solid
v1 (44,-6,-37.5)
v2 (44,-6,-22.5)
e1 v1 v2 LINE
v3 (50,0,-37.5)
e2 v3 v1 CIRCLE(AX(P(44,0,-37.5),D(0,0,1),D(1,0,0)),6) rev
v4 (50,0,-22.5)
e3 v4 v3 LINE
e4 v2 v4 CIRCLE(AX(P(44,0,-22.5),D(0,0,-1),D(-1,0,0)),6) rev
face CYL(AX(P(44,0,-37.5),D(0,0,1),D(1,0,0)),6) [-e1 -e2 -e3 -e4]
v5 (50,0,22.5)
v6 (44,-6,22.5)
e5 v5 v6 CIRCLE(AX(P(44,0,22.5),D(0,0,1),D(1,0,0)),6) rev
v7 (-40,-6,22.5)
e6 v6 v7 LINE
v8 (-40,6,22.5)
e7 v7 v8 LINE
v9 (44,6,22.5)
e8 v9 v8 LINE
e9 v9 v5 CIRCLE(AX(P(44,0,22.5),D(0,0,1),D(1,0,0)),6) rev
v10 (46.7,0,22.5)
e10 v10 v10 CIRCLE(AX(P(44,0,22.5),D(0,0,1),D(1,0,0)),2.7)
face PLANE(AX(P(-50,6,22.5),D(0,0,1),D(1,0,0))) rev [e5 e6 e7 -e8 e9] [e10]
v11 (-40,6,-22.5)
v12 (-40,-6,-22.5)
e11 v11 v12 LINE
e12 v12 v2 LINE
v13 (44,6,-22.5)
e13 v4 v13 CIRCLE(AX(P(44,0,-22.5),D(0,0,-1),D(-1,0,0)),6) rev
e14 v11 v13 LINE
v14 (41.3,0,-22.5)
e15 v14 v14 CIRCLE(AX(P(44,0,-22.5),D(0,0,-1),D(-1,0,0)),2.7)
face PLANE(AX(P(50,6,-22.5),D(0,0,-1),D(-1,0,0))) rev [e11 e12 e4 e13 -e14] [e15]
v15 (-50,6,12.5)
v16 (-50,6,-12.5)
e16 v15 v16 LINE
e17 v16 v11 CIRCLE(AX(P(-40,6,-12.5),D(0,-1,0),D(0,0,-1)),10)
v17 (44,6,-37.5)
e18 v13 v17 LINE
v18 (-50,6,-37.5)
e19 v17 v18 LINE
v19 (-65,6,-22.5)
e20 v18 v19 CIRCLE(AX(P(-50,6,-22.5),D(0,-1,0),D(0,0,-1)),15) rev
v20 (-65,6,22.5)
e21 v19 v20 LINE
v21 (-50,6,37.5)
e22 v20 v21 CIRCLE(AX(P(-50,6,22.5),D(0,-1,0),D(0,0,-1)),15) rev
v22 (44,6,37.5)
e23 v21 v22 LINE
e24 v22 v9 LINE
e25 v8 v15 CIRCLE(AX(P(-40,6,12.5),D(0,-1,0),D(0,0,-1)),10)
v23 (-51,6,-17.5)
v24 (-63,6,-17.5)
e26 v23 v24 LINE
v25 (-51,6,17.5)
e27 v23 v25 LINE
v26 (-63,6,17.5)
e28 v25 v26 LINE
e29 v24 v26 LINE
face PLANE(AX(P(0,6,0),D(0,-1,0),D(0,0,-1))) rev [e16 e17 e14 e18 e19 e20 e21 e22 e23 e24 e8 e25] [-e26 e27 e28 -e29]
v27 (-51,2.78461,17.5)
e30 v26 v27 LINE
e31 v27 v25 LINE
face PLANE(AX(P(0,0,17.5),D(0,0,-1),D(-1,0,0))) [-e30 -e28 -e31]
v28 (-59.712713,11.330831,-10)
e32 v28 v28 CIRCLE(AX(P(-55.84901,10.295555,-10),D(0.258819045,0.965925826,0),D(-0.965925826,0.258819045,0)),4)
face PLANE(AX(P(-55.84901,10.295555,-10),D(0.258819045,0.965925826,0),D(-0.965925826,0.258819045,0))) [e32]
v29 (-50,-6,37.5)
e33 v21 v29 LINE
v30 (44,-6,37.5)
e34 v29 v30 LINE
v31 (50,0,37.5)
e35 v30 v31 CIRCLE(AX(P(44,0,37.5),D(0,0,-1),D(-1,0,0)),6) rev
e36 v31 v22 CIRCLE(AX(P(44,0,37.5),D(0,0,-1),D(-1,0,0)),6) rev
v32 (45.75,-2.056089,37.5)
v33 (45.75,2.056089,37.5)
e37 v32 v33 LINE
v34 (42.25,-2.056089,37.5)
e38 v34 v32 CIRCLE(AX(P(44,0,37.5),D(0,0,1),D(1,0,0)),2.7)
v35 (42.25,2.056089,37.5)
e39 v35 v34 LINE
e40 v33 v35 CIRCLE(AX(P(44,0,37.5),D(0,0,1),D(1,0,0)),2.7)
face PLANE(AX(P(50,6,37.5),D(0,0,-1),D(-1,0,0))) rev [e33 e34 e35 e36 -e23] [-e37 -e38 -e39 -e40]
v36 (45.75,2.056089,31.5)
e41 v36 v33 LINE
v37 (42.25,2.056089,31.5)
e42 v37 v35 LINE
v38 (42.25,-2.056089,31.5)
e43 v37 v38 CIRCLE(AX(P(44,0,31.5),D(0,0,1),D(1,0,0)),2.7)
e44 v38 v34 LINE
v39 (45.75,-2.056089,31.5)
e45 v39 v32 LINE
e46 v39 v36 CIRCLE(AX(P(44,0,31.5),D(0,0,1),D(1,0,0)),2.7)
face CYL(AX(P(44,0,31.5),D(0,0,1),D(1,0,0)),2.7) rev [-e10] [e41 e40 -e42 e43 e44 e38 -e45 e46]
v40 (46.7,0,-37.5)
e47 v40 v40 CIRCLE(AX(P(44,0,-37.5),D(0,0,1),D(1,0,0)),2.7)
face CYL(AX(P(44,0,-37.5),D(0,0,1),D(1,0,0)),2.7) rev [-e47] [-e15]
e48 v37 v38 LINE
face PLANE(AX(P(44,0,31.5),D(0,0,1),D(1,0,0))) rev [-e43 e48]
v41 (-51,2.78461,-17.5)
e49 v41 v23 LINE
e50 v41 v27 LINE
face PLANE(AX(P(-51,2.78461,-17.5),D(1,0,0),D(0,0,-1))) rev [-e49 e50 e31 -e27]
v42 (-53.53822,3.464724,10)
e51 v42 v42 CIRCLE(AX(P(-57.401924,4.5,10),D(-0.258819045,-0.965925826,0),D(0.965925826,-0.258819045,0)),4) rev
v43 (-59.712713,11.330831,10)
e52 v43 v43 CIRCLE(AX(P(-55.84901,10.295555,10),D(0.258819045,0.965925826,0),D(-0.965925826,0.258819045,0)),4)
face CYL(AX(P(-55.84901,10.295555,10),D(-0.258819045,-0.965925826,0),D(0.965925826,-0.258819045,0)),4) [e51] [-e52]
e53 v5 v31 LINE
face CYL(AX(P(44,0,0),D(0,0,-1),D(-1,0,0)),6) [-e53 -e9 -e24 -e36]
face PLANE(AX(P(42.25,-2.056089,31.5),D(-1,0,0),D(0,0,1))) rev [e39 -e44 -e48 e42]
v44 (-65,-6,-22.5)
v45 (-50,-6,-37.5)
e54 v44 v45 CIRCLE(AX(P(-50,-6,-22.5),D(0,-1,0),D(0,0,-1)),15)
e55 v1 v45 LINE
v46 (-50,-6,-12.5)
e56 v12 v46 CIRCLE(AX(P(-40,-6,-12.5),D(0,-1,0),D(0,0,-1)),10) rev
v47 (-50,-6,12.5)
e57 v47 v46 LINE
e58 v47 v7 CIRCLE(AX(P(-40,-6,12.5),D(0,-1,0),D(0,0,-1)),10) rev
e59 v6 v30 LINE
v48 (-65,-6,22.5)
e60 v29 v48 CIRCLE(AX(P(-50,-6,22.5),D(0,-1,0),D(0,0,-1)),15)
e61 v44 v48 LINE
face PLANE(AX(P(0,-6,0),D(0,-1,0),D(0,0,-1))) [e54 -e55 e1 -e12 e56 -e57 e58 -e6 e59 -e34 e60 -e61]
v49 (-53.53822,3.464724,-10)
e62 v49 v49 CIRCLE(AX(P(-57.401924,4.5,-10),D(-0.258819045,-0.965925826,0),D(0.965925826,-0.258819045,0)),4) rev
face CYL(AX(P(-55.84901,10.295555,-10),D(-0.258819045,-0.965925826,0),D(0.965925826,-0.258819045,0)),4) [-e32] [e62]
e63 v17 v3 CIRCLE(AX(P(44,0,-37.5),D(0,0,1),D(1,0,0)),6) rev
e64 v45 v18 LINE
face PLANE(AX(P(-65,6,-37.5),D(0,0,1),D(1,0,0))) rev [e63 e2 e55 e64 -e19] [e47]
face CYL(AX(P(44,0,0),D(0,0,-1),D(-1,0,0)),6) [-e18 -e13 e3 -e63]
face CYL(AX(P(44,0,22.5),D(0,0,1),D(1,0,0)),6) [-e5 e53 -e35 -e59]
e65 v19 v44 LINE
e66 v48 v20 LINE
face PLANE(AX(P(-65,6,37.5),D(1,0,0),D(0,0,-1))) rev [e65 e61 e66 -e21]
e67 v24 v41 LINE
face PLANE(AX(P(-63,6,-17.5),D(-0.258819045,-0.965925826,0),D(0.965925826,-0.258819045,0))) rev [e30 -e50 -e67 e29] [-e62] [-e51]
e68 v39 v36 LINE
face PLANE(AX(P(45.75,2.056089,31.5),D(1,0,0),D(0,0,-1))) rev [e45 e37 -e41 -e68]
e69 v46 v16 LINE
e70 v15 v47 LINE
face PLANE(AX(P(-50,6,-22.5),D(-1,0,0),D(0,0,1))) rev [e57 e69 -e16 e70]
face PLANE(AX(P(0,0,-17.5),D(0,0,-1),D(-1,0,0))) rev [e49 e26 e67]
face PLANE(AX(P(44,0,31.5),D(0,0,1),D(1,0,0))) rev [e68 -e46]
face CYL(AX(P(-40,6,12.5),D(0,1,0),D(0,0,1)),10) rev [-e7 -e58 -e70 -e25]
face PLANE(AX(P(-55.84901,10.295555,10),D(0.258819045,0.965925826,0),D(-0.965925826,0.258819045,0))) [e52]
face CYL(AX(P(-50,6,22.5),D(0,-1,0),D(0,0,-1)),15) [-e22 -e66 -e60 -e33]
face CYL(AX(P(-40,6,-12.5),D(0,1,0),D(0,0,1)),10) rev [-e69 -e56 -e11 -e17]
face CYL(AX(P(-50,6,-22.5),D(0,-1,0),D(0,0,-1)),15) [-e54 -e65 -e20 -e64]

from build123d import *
from OCP.BRepFilletAPI import BRepFilletAPI_MakeFillet
from build123d.topology import SkipClean

# Parameters (mm, degrees)
BOSS_EXTRUDE1_DEPTH = 6
FILLET1_R           = 6
FILLET2_R1          = 10
FILLET2_R2          = 15
CUT_EXTRUDE1_DEPTH  = 17.5
SKETCH5_R           = 4
BOSS_EXTRUDE2_DEPTH = 6
CUT_EXTRUDE2_DEPTH  = 6
SKETCH7_R           = 2.7
CUT_EXTRUDE4_DEPTH  = 96.469302576


with BuildPart() as part:
    # Sketch1 → Boss-Extrude1 (new, symmetric)
    with BuildSketch(Plane(origin=(0, 0, 0), x_dir=(1, 0, 0), z_dir=(0, 1, 0))):
        Polygon((50, 37.5), (50, 22.5), (-50, 22.5), (-50, -22.5), (50, -22.5), (50, -37.5), (-65, -37.5), (-65, 37.5), align=None)
    extrude(amount=BOSS_EXTRUDE1_DEPTH, both=True)

    # Fillet1
    fillet1_edges = [part.edges().sort_by_distance(p)[0] for p in [
        (50, 6, -30),
        (50, -6, -30),
        (50, -6, 30),
        (50, 6, 30),
    ]]
    fillet(fillet1_edges, radius=FILLET1_R - 0.0001)  # a hair under: the kernel refuses the full size

    # Fillet2: one fillet with a radius per group of edges: ONE call of the kernel's fillet builder (fillet() takes one radius for all edges)
    fillet2_edges_1 = [part.edges().sort_by_distance(p)[0] for p in [
        (-50, 0, 22.5),
        (-50, 0, -22.5),
    ]]
    fillet2_edges_2 = [part.edges().sort_by_distance(p)[0] for p in [
        (-65, 0, 37.5),
        (-65, 0, -37.5),
    ]]
    fillet2 = BRepFilletAPI_MakeFillet(part.part.solid().wrapped)
    for e in fillet2_edges_1:
        fillet2.Add(FILLET2_R1, e.wrapped)
    for e in fillet2_edges_2:
        fillet2.Add(FILLET2_R2, e.wrapped)
    add(Compound.cast(fillet2.Shape()), mode=Mode.REPLACE)

    # Sketch4 → Cut-Extrude1 (cut, symmetric)
    with BuildSketch(Plane.XY):
        Polygon((-63, 6), (-51, 2.784609691), (-51, 6), align=None)
    extrude(amount=CUT_EXTRUDE1_DEPTH, both=True, mode=Mode.SUBTRACT)

    # Sketch5 → Boss-Extrude2 (add)
    with BuildSketch(Plane(origin=(-2.720199781, -10.151923789, 0), x_dir=(0.9659258262890701, -0.25881904510251424, 0), z_dir=(0.25881904510251424, 0.9659258262890701, 0))):
        with Locations((-56.610686369, 10)):
            Circle(SKETCH5_R)
        with Locations((-56.610686369, -10)):
            Circle(SKETCH5_R)
    extrude(amount=BOSS_EXTRUDE2_DEPTH)

    # Sketch6 → Cut-Extrude2 (cut)
    with BuildSketch(Plane.XY.offset(37.5)):
        with BuildLine():
            Line((42.25, -2.056088519), (42.25, 2.056088519))
            ThreePointArc((42.25, 2.056088519), (44, 2.7), (45.75, 2.056088519))
            Line((45.75, 2.056088519), (45.75, -2.056088519))
            ThreePointArc((45.75, -2.056088519), (44, -2.7), (42.25, -2.056088519))
        make_face()
    extrude(amount=-CUT_EXTRUDE2_DEPTH, mode=Mode.SUBTRACT)

    # Sketch7 → Cut-Extrude4 (cut, through all)
    with SkipClean():  # the faces are left unmerged after this step: merging them gives an invalid solid
        with BuildSketch(Plane.XY.offset(31.5)):
            with Locations((44, 0)):
                Circle(SKETCH7_R)
        extrude(amount=-CUT_EXTRUDE4_DEPTH, mode=Mode.SUBTRACT)


solid = part.part
